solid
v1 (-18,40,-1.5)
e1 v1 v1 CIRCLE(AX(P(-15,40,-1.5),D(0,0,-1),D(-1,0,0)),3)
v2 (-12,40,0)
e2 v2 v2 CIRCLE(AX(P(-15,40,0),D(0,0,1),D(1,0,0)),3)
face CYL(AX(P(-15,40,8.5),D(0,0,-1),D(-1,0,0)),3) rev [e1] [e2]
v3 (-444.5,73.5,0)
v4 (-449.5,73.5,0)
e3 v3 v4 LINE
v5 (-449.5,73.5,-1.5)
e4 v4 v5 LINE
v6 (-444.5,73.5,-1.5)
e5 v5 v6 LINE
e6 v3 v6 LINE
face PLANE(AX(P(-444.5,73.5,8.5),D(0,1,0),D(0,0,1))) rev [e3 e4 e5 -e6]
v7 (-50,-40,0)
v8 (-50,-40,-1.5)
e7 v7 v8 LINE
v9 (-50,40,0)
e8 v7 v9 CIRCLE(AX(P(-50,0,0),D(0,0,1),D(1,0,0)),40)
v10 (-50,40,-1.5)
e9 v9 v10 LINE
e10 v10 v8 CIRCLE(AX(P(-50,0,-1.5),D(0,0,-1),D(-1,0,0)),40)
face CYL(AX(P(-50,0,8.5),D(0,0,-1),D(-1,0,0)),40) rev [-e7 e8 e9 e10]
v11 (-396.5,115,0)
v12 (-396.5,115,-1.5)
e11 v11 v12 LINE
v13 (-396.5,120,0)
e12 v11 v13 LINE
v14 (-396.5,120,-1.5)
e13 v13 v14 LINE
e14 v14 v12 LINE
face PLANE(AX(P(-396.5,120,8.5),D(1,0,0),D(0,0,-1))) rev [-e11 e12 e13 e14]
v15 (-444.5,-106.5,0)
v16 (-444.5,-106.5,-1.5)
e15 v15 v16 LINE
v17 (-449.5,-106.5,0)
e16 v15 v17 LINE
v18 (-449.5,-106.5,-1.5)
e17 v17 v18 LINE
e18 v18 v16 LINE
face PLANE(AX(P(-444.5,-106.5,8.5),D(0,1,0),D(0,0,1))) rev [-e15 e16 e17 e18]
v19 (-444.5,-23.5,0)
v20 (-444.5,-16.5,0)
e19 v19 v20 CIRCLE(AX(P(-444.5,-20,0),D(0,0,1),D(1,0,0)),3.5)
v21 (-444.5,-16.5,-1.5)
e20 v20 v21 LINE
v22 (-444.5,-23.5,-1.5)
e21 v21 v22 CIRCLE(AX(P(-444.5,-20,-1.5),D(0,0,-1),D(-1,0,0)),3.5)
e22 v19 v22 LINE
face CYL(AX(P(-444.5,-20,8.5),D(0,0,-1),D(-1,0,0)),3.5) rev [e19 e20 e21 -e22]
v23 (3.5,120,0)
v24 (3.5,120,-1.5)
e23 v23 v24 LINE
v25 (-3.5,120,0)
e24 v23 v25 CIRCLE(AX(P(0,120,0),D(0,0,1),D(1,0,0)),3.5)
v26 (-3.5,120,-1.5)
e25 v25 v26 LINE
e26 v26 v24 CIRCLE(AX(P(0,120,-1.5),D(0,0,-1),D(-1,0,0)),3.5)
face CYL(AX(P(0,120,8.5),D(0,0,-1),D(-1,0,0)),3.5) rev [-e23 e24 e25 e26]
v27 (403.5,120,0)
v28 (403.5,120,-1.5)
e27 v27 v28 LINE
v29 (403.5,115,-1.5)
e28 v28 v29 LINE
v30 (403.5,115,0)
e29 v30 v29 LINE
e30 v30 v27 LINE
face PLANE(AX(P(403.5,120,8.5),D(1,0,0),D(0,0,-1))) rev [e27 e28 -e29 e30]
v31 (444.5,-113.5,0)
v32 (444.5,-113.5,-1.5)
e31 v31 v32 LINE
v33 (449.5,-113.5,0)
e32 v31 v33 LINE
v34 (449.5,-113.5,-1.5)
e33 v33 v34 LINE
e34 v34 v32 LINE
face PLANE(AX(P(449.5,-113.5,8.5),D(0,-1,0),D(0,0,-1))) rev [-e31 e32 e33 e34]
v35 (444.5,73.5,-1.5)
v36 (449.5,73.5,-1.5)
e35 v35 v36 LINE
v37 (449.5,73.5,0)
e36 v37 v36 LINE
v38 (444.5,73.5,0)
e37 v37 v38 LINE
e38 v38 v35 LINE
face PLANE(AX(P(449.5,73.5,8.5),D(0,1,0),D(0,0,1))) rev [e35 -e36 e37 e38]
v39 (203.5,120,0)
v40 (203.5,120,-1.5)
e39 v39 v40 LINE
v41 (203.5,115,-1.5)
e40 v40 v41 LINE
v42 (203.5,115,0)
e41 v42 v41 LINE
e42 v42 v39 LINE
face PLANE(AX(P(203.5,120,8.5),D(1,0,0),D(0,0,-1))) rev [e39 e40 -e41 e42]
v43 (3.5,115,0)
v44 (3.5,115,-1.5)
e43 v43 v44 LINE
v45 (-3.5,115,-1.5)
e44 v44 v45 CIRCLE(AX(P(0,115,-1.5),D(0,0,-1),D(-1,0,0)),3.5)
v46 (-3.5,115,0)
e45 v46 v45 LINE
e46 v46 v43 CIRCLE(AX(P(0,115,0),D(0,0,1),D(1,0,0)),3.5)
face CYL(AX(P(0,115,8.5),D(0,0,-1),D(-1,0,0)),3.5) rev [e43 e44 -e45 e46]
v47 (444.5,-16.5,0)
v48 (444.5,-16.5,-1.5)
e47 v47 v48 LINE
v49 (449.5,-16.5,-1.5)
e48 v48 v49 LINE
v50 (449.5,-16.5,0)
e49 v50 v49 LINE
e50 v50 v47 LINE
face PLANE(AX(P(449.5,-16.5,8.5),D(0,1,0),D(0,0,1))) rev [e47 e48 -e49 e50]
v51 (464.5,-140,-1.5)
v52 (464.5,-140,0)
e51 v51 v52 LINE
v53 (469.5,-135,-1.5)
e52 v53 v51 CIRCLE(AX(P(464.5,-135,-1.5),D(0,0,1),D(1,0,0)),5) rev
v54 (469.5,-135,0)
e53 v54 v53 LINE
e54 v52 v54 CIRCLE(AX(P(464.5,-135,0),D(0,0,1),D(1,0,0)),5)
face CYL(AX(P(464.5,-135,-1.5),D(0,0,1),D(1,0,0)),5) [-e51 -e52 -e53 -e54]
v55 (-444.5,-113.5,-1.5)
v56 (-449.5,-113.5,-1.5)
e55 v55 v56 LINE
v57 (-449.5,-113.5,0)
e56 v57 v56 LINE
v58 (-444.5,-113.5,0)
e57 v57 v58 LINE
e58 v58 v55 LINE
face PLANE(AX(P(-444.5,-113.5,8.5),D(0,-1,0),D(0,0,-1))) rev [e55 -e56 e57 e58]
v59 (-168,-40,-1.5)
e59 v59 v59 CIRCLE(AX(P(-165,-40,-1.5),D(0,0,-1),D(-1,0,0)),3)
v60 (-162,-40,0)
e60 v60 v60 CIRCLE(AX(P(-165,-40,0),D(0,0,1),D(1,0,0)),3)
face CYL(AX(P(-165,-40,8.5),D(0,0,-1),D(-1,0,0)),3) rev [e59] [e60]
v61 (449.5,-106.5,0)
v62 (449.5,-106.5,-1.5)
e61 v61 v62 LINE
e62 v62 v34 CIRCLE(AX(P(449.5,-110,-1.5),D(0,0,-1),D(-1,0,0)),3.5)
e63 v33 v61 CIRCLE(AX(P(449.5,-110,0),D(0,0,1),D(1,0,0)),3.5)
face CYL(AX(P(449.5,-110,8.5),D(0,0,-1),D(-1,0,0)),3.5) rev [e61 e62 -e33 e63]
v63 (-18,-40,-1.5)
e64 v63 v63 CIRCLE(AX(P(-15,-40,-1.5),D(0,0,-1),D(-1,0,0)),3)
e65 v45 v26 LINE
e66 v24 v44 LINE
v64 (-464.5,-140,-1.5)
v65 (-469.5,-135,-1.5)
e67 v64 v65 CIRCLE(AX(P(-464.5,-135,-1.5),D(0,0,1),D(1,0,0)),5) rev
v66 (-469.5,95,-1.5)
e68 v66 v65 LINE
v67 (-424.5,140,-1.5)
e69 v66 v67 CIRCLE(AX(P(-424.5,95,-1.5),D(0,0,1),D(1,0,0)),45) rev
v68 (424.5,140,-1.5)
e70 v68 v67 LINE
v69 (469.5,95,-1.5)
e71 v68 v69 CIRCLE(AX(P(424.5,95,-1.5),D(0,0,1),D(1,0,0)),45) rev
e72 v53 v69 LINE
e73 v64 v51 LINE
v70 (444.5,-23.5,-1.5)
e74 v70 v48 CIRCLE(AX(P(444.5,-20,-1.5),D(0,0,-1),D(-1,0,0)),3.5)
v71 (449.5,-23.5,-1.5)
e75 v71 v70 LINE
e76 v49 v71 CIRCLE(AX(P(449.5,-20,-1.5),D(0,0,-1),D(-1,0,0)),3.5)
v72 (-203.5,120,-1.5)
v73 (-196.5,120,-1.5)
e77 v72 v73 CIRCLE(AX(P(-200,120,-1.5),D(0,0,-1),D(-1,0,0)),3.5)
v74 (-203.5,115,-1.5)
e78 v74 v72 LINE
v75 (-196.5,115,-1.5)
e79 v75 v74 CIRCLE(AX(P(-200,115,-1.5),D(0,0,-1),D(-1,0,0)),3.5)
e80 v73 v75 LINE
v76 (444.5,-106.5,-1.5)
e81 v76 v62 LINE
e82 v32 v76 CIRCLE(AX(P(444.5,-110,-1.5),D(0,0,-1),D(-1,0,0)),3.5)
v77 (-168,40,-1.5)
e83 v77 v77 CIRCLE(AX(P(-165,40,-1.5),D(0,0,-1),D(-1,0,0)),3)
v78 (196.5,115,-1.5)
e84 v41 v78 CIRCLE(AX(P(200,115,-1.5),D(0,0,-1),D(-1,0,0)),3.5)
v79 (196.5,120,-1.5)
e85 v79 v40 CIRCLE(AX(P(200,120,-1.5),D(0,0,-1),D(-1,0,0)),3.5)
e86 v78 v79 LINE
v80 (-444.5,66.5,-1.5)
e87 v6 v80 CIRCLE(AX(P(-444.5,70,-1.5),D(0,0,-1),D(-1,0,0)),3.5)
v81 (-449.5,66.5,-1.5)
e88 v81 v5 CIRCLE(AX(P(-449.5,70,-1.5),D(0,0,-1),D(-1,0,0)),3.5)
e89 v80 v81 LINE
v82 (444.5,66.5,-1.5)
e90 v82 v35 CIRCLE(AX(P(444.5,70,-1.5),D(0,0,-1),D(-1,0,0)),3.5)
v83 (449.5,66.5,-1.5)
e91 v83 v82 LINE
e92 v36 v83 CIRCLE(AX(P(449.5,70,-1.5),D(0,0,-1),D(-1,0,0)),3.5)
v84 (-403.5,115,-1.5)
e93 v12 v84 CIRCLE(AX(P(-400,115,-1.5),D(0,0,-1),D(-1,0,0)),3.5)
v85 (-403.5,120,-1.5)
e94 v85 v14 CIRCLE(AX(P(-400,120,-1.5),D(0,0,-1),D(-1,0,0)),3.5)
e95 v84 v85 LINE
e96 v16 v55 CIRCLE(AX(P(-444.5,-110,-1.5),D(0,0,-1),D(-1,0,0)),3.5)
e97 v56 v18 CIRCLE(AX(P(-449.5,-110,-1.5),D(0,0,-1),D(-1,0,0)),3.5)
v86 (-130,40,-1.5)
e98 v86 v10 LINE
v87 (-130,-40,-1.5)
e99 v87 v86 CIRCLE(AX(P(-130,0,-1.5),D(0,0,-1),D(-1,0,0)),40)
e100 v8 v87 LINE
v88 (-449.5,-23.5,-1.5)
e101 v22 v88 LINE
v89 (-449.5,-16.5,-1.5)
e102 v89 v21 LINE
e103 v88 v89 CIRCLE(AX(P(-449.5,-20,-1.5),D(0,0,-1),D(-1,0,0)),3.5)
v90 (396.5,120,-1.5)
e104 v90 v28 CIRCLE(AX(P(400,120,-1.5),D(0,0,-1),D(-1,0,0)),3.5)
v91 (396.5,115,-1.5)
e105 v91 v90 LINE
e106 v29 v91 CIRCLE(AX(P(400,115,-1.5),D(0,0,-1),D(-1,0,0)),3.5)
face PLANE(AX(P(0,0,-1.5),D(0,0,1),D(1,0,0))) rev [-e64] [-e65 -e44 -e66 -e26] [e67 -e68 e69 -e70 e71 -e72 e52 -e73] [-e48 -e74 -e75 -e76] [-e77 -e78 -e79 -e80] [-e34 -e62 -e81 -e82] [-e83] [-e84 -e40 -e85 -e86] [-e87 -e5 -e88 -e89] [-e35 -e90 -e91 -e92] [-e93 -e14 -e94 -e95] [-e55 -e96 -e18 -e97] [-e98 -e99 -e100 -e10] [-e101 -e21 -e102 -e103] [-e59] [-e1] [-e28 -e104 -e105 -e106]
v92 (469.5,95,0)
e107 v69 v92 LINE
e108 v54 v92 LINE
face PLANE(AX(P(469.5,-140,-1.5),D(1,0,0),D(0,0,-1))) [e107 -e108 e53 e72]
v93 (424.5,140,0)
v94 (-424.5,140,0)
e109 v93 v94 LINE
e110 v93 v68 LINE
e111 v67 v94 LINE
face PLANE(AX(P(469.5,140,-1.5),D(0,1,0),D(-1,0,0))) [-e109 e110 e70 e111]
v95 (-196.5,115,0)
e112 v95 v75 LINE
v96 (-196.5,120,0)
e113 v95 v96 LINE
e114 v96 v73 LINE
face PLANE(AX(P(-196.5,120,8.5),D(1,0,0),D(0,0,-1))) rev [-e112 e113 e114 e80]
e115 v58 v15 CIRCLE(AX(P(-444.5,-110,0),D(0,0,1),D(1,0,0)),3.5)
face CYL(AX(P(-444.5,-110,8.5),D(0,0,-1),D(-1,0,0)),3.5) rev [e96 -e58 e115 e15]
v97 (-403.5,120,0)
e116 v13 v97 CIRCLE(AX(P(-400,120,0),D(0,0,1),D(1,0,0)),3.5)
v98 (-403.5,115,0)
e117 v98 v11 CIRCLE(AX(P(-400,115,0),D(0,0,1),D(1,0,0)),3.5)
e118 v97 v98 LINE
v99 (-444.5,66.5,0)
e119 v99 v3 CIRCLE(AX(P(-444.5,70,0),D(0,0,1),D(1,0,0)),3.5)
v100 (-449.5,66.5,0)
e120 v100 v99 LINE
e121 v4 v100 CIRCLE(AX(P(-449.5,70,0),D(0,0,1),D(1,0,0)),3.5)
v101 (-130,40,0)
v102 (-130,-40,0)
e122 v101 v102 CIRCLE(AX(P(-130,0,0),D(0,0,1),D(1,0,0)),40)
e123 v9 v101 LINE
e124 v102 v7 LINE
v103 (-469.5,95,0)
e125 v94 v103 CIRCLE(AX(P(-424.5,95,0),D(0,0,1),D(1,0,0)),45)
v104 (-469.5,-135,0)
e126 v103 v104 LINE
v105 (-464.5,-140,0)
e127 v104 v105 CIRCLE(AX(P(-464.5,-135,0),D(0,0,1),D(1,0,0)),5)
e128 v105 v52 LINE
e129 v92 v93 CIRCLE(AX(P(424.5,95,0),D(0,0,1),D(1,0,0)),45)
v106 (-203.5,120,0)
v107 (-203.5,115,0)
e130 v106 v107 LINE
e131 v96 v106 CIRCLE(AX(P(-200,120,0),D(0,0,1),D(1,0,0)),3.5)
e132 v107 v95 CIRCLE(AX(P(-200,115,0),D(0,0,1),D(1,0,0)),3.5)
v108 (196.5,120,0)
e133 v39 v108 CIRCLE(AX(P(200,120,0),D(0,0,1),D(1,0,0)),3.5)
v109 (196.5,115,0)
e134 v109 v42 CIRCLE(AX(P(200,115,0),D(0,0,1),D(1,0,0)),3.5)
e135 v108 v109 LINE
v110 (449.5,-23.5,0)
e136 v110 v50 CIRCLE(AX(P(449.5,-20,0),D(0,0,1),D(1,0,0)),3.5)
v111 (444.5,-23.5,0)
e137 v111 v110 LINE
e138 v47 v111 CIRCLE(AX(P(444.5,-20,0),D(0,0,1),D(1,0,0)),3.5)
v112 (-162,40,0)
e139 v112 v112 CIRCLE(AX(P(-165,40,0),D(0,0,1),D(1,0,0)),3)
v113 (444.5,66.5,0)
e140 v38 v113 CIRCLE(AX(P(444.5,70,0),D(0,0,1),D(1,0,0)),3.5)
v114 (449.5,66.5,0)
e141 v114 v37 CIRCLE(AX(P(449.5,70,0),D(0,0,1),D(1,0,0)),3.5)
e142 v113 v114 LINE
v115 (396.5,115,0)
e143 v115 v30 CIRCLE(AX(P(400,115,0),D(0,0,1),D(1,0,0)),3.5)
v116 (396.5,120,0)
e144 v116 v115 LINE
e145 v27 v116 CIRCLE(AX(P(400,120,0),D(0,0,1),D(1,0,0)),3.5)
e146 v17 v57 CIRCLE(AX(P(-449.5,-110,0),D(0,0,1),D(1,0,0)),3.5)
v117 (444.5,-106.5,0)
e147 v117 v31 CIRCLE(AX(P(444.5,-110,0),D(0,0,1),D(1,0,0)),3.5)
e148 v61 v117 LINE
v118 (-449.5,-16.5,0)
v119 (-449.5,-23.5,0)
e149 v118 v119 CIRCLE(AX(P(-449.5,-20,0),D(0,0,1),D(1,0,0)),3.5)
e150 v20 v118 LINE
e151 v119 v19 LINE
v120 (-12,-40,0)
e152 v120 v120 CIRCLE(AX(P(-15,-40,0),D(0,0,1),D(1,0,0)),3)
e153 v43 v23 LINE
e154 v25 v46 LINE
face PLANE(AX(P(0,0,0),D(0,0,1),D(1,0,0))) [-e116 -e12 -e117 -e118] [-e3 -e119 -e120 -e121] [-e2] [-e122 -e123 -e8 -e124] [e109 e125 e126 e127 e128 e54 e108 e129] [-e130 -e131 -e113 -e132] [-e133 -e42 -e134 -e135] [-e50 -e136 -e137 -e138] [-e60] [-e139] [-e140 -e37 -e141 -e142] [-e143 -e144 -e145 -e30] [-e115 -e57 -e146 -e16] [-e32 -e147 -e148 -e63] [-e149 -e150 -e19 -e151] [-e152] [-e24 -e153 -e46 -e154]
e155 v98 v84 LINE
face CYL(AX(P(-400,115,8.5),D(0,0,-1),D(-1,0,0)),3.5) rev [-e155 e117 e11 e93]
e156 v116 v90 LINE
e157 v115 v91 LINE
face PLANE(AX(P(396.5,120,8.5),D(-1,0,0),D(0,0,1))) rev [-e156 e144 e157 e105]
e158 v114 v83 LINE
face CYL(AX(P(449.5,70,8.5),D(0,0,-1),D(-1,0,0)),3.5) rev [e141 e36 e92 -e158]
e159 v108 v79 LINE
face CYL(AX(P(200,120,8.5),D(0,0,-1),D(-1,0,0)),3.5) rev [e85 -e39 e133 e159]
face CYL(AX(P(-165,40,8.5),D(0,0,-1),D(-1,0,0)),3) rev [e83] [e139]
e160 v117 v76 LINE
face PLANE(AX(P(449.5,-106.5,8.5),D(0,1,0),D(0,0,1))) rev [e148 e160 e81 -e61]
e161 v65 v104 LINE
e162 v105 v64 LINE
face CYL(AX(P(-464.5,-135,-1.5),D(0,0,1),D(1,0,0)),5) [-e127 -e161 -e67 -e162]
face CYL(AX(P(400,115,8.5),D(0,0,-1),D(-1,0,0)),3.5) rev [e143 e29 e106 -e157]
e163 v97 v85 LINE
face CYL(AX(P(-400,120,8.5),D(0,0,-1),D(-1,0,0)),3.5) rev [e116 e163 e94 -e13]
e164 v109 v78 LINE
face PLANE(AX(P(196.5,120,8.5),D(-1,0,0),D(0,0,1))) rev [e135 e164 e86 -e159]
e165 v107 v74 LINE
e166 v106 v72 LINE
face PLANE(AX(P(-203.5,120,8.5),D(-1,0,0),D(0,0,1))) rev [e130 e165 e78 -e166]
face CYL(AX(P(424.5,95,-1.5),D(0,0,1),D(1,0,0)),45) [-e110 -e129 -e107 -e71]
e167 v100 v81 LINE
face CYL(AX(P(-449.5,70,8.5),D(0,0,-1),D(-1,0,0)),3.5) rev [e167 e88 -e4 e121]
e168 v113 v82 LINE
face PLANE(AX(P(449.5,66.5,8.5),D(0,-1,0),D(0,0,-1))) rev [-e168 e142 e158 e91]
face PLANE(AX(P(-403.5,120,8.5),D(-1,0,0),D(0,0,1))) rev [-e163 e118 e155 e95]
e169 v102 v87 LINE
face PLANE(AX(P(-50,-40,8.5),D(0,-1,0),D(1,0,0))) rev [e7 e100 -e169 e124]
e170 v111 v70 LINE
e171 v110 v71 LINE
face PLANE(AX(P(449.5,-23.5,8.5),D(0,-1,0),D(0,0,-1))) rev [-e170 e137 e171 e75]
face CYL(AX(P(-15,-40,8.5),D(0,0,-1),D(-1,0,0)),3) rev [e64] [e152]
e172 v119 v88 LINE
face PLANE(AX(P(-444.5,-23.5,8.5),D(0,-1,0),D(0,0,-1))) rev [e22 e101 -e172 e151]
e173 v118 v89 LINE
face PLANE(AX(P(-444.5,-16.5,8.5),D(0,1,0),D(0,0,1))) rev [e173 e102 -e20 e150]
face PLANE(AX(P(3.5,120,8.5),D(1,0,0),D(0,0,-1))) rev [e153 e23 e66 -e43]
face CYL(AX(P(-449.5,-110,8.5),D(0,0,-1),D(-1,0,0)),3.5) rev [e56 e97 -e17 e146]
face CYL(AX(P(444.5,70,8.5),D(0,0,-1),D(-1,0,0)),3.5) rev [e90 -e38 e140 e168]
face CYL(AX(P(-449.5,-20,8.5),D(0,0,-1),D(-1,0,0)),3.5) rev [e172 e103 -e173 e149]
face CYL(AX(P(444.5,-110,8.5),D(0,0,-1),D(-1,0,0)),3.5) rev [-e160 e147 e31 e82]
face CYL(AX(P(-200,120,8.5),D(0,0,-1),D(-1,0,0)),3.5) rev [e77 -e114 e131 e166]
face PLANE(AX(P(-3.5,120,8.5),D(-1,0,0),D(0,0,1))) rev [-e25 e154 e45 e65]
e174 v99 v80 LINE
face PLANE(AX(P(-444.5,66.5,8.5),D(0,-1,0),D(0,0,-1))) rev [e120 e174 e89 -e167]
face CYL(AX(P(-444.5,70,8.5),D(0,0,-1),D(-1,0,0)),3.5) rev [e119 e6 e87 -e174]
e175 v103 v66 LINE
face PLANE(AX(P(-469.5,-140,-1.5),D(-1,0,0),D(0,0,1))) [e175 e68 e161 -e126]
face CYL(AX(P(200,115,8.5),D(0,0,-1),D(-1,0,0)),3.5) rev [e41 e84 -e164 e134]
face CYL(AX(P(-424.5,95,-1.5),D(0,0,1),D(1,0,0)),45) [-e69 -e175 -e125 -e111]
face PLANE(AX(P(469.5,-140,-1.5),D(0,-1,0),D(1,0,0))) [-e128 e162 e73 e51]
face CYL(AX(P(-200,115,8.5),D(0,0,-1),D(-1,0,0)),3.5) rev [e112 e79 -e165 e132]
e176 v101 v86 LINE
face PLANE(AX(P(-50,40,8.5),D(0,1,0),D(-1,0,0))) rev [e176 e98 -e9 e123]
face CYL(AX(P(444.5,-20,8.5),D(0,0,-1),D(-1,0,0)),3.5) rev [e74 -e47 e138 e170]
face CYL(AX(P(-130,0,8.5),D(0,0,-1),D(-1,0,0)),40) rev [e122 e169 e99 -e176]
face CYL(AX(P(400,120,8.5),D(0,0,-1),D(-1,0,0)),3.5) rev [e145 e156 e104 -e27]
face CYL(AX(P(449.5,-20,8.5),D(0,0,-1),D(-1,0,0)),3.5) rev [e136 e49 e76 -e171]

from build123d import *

# Parameters (mm, degrees)
SKETCH_1_W             = 939
SKETCH_1_H             = 280
SM_BASE_FLANGE_1_DEPTH = 1.5
CUT_EXTRUDE_1_DEPTH    = 10
FILLET_1_R             = 45
FILLET_2_R             = 5
CUT_EXTRUDE_2_DEPTH    = 10
PATTERN_LINEAR_1_COUNT = 5
PATTERN_LINEAR_1_PITCH = 200
CUT_EXTRUDE_3_DEPTH    = 10
PATTERN_LINEAR_2_COUNT = 3
PATTERN_LINEAR_2_PITCH = 90
SKETCH_36_R            = 3
CUT_EXTRUDE_4_DEPTH    = 10


# Sheet-metal steps are written as plain solids
with BuildPart() as part:
    # Sketch 1 → 基体-法兰1 (new body)
    with BuildSketch(Plane.XY):
        Rectangle(SKETCH_1_W, SKETCH_1_H)
    extrude(amount=-SM_BASE_FLANGE_1_DEPTH)

    # 草图33 → 切除-拉伸1 (cut)
    with BuildSketch(Plane(origin=(0, 0, -1.5), x_dir=(-1, 0, 0), z_dir=(0, 0, -1))):
        with BuildLine():
            Line((50, 40), (130, 40))
            ThreePointArc((130, 40), (170, 0), (130, -40))
            Line((130, -40), (50, -40))
            ThreePointArc((50, -40), (10, 0), (50, 40))
        make_face()
    extrude(amount=-CUT_EXTRUDE_1_DEPTH, mode=Mode.SUBTRACT)

    # 圆角1
    fillet_1_edges = [part.edges().sort_by_distance(p)[0] for p in [
        (-469.5, 140, -0.75),
        (469.5, 140, -0.75),
    ]]
    fillet(fillet_1_edges, radius=FILLET_1_R)

    # 圆角2
    fillet_2_edges = [part.edges().sort_by_distance(p)[0] for p in [
        (469.5, -140, -0.75),
        (-469.5, -140, -0.75),
    ]]
    fillet(fillet_2_edges, radius=FILLET_2_R)

    # 草图34 → 切除-拉伸2 (cut)
    with BuildSketch(Plane(origin=(0, 0, -1.5), x_dir=(-1, 0, 0), z_dir=(0, 0, -1))):
        with BuildLine():
            Line((-396.5, 120), (-396.5, 115))
            ThreePointArc((-396.5, 115), (-400, 111.5), (-403.5, 115))
            Line((-403.5, 115), (-403.5, 120))
            ThreePointArc((-403.5, 120), (-400, 123.5), (-396.5, 120))
        make_face()
    cut_extrude_2 = extrude(amount=-CUT_EXTRUDE_2_DEPTH, mode=Mode.SUBTRACT)

    # 阵列(线性)1: 切除-拉伸2 ×5
    with Locations(*[(-i * PATTERN_LINEAR_1_PITCH, 0, 0) for i in range(1, PATTERN_LINEAR_1_COUNT)]):
        add(cut_extrude_2, mode=Mode.SUBTRACT)

    # 草图35 → 切除-拉伸3 (cut)
    with BuildSketch(Plane(origin=(0, 0, -1.5), x_dir=(-1, 0, 0), z_dir=(0, 0, -1))):
        with BuildLine():
            Line((-449.5, -106.5), (-444.5, -106.5))
            ThreePointArc((-444.5, -106.5), (-441, -110), (-444.5, -113.5))
            Line((-444.5, -113.5), (-449.5, -113.5))
            ThreePointArc((-449.5, -113.5), (-453, -110), (-449.5, -106.5))
        make_face()
        with BuildLine():
            Line((444.5, -106.5), (449.5, -106.5))
            ThreePointArc((449.5, -106.5), (453, -110), (449.5, -113.5))
            Line((449.5, -113.5), (444.5, -113.5))
            ThreePointArc((444.5, -113.5), (441, -110), (444.5, -106.5))
        make_face()
    cut_extrude_3 = extrude(amount=-CUT_EXTRUDE_3_DEPTH, mode=Mode.SUBTRACT)

    # 阵列(线性)2: 切除-拉伸3 ×3
    with Locations(*[(0, i * PATTERN_LINEAR_2_PITCH, 0) for i in range(1, PATTERN_LINEAR_2_COUNT)]):
        add(cut_extrude_3, mode=Mode.SUBTRACT)

    # 草图36 → 切除-拉伸4 (cut)
    with BuildSketch(Plane(origin=(0, 0, -1.5), x_dir=(-1, 0, 0), z_dir=(0, 0, -1))):
        with Locations((15, 40)):
            Circle(SKETCH_36_R)
        with Locations((165, 40)):
            Circle(SKETCH_36_R)
        with Locations((165, -40)):
            Circle(SKETCH_36_R)
        with Locations((15, -40)):
            Circle(SKETCH_36_R)
    extrude(amount=-CUT_EXTRUDE_4_DEPTH, mode=Mode.SUBTRACT)


solid = part.part
